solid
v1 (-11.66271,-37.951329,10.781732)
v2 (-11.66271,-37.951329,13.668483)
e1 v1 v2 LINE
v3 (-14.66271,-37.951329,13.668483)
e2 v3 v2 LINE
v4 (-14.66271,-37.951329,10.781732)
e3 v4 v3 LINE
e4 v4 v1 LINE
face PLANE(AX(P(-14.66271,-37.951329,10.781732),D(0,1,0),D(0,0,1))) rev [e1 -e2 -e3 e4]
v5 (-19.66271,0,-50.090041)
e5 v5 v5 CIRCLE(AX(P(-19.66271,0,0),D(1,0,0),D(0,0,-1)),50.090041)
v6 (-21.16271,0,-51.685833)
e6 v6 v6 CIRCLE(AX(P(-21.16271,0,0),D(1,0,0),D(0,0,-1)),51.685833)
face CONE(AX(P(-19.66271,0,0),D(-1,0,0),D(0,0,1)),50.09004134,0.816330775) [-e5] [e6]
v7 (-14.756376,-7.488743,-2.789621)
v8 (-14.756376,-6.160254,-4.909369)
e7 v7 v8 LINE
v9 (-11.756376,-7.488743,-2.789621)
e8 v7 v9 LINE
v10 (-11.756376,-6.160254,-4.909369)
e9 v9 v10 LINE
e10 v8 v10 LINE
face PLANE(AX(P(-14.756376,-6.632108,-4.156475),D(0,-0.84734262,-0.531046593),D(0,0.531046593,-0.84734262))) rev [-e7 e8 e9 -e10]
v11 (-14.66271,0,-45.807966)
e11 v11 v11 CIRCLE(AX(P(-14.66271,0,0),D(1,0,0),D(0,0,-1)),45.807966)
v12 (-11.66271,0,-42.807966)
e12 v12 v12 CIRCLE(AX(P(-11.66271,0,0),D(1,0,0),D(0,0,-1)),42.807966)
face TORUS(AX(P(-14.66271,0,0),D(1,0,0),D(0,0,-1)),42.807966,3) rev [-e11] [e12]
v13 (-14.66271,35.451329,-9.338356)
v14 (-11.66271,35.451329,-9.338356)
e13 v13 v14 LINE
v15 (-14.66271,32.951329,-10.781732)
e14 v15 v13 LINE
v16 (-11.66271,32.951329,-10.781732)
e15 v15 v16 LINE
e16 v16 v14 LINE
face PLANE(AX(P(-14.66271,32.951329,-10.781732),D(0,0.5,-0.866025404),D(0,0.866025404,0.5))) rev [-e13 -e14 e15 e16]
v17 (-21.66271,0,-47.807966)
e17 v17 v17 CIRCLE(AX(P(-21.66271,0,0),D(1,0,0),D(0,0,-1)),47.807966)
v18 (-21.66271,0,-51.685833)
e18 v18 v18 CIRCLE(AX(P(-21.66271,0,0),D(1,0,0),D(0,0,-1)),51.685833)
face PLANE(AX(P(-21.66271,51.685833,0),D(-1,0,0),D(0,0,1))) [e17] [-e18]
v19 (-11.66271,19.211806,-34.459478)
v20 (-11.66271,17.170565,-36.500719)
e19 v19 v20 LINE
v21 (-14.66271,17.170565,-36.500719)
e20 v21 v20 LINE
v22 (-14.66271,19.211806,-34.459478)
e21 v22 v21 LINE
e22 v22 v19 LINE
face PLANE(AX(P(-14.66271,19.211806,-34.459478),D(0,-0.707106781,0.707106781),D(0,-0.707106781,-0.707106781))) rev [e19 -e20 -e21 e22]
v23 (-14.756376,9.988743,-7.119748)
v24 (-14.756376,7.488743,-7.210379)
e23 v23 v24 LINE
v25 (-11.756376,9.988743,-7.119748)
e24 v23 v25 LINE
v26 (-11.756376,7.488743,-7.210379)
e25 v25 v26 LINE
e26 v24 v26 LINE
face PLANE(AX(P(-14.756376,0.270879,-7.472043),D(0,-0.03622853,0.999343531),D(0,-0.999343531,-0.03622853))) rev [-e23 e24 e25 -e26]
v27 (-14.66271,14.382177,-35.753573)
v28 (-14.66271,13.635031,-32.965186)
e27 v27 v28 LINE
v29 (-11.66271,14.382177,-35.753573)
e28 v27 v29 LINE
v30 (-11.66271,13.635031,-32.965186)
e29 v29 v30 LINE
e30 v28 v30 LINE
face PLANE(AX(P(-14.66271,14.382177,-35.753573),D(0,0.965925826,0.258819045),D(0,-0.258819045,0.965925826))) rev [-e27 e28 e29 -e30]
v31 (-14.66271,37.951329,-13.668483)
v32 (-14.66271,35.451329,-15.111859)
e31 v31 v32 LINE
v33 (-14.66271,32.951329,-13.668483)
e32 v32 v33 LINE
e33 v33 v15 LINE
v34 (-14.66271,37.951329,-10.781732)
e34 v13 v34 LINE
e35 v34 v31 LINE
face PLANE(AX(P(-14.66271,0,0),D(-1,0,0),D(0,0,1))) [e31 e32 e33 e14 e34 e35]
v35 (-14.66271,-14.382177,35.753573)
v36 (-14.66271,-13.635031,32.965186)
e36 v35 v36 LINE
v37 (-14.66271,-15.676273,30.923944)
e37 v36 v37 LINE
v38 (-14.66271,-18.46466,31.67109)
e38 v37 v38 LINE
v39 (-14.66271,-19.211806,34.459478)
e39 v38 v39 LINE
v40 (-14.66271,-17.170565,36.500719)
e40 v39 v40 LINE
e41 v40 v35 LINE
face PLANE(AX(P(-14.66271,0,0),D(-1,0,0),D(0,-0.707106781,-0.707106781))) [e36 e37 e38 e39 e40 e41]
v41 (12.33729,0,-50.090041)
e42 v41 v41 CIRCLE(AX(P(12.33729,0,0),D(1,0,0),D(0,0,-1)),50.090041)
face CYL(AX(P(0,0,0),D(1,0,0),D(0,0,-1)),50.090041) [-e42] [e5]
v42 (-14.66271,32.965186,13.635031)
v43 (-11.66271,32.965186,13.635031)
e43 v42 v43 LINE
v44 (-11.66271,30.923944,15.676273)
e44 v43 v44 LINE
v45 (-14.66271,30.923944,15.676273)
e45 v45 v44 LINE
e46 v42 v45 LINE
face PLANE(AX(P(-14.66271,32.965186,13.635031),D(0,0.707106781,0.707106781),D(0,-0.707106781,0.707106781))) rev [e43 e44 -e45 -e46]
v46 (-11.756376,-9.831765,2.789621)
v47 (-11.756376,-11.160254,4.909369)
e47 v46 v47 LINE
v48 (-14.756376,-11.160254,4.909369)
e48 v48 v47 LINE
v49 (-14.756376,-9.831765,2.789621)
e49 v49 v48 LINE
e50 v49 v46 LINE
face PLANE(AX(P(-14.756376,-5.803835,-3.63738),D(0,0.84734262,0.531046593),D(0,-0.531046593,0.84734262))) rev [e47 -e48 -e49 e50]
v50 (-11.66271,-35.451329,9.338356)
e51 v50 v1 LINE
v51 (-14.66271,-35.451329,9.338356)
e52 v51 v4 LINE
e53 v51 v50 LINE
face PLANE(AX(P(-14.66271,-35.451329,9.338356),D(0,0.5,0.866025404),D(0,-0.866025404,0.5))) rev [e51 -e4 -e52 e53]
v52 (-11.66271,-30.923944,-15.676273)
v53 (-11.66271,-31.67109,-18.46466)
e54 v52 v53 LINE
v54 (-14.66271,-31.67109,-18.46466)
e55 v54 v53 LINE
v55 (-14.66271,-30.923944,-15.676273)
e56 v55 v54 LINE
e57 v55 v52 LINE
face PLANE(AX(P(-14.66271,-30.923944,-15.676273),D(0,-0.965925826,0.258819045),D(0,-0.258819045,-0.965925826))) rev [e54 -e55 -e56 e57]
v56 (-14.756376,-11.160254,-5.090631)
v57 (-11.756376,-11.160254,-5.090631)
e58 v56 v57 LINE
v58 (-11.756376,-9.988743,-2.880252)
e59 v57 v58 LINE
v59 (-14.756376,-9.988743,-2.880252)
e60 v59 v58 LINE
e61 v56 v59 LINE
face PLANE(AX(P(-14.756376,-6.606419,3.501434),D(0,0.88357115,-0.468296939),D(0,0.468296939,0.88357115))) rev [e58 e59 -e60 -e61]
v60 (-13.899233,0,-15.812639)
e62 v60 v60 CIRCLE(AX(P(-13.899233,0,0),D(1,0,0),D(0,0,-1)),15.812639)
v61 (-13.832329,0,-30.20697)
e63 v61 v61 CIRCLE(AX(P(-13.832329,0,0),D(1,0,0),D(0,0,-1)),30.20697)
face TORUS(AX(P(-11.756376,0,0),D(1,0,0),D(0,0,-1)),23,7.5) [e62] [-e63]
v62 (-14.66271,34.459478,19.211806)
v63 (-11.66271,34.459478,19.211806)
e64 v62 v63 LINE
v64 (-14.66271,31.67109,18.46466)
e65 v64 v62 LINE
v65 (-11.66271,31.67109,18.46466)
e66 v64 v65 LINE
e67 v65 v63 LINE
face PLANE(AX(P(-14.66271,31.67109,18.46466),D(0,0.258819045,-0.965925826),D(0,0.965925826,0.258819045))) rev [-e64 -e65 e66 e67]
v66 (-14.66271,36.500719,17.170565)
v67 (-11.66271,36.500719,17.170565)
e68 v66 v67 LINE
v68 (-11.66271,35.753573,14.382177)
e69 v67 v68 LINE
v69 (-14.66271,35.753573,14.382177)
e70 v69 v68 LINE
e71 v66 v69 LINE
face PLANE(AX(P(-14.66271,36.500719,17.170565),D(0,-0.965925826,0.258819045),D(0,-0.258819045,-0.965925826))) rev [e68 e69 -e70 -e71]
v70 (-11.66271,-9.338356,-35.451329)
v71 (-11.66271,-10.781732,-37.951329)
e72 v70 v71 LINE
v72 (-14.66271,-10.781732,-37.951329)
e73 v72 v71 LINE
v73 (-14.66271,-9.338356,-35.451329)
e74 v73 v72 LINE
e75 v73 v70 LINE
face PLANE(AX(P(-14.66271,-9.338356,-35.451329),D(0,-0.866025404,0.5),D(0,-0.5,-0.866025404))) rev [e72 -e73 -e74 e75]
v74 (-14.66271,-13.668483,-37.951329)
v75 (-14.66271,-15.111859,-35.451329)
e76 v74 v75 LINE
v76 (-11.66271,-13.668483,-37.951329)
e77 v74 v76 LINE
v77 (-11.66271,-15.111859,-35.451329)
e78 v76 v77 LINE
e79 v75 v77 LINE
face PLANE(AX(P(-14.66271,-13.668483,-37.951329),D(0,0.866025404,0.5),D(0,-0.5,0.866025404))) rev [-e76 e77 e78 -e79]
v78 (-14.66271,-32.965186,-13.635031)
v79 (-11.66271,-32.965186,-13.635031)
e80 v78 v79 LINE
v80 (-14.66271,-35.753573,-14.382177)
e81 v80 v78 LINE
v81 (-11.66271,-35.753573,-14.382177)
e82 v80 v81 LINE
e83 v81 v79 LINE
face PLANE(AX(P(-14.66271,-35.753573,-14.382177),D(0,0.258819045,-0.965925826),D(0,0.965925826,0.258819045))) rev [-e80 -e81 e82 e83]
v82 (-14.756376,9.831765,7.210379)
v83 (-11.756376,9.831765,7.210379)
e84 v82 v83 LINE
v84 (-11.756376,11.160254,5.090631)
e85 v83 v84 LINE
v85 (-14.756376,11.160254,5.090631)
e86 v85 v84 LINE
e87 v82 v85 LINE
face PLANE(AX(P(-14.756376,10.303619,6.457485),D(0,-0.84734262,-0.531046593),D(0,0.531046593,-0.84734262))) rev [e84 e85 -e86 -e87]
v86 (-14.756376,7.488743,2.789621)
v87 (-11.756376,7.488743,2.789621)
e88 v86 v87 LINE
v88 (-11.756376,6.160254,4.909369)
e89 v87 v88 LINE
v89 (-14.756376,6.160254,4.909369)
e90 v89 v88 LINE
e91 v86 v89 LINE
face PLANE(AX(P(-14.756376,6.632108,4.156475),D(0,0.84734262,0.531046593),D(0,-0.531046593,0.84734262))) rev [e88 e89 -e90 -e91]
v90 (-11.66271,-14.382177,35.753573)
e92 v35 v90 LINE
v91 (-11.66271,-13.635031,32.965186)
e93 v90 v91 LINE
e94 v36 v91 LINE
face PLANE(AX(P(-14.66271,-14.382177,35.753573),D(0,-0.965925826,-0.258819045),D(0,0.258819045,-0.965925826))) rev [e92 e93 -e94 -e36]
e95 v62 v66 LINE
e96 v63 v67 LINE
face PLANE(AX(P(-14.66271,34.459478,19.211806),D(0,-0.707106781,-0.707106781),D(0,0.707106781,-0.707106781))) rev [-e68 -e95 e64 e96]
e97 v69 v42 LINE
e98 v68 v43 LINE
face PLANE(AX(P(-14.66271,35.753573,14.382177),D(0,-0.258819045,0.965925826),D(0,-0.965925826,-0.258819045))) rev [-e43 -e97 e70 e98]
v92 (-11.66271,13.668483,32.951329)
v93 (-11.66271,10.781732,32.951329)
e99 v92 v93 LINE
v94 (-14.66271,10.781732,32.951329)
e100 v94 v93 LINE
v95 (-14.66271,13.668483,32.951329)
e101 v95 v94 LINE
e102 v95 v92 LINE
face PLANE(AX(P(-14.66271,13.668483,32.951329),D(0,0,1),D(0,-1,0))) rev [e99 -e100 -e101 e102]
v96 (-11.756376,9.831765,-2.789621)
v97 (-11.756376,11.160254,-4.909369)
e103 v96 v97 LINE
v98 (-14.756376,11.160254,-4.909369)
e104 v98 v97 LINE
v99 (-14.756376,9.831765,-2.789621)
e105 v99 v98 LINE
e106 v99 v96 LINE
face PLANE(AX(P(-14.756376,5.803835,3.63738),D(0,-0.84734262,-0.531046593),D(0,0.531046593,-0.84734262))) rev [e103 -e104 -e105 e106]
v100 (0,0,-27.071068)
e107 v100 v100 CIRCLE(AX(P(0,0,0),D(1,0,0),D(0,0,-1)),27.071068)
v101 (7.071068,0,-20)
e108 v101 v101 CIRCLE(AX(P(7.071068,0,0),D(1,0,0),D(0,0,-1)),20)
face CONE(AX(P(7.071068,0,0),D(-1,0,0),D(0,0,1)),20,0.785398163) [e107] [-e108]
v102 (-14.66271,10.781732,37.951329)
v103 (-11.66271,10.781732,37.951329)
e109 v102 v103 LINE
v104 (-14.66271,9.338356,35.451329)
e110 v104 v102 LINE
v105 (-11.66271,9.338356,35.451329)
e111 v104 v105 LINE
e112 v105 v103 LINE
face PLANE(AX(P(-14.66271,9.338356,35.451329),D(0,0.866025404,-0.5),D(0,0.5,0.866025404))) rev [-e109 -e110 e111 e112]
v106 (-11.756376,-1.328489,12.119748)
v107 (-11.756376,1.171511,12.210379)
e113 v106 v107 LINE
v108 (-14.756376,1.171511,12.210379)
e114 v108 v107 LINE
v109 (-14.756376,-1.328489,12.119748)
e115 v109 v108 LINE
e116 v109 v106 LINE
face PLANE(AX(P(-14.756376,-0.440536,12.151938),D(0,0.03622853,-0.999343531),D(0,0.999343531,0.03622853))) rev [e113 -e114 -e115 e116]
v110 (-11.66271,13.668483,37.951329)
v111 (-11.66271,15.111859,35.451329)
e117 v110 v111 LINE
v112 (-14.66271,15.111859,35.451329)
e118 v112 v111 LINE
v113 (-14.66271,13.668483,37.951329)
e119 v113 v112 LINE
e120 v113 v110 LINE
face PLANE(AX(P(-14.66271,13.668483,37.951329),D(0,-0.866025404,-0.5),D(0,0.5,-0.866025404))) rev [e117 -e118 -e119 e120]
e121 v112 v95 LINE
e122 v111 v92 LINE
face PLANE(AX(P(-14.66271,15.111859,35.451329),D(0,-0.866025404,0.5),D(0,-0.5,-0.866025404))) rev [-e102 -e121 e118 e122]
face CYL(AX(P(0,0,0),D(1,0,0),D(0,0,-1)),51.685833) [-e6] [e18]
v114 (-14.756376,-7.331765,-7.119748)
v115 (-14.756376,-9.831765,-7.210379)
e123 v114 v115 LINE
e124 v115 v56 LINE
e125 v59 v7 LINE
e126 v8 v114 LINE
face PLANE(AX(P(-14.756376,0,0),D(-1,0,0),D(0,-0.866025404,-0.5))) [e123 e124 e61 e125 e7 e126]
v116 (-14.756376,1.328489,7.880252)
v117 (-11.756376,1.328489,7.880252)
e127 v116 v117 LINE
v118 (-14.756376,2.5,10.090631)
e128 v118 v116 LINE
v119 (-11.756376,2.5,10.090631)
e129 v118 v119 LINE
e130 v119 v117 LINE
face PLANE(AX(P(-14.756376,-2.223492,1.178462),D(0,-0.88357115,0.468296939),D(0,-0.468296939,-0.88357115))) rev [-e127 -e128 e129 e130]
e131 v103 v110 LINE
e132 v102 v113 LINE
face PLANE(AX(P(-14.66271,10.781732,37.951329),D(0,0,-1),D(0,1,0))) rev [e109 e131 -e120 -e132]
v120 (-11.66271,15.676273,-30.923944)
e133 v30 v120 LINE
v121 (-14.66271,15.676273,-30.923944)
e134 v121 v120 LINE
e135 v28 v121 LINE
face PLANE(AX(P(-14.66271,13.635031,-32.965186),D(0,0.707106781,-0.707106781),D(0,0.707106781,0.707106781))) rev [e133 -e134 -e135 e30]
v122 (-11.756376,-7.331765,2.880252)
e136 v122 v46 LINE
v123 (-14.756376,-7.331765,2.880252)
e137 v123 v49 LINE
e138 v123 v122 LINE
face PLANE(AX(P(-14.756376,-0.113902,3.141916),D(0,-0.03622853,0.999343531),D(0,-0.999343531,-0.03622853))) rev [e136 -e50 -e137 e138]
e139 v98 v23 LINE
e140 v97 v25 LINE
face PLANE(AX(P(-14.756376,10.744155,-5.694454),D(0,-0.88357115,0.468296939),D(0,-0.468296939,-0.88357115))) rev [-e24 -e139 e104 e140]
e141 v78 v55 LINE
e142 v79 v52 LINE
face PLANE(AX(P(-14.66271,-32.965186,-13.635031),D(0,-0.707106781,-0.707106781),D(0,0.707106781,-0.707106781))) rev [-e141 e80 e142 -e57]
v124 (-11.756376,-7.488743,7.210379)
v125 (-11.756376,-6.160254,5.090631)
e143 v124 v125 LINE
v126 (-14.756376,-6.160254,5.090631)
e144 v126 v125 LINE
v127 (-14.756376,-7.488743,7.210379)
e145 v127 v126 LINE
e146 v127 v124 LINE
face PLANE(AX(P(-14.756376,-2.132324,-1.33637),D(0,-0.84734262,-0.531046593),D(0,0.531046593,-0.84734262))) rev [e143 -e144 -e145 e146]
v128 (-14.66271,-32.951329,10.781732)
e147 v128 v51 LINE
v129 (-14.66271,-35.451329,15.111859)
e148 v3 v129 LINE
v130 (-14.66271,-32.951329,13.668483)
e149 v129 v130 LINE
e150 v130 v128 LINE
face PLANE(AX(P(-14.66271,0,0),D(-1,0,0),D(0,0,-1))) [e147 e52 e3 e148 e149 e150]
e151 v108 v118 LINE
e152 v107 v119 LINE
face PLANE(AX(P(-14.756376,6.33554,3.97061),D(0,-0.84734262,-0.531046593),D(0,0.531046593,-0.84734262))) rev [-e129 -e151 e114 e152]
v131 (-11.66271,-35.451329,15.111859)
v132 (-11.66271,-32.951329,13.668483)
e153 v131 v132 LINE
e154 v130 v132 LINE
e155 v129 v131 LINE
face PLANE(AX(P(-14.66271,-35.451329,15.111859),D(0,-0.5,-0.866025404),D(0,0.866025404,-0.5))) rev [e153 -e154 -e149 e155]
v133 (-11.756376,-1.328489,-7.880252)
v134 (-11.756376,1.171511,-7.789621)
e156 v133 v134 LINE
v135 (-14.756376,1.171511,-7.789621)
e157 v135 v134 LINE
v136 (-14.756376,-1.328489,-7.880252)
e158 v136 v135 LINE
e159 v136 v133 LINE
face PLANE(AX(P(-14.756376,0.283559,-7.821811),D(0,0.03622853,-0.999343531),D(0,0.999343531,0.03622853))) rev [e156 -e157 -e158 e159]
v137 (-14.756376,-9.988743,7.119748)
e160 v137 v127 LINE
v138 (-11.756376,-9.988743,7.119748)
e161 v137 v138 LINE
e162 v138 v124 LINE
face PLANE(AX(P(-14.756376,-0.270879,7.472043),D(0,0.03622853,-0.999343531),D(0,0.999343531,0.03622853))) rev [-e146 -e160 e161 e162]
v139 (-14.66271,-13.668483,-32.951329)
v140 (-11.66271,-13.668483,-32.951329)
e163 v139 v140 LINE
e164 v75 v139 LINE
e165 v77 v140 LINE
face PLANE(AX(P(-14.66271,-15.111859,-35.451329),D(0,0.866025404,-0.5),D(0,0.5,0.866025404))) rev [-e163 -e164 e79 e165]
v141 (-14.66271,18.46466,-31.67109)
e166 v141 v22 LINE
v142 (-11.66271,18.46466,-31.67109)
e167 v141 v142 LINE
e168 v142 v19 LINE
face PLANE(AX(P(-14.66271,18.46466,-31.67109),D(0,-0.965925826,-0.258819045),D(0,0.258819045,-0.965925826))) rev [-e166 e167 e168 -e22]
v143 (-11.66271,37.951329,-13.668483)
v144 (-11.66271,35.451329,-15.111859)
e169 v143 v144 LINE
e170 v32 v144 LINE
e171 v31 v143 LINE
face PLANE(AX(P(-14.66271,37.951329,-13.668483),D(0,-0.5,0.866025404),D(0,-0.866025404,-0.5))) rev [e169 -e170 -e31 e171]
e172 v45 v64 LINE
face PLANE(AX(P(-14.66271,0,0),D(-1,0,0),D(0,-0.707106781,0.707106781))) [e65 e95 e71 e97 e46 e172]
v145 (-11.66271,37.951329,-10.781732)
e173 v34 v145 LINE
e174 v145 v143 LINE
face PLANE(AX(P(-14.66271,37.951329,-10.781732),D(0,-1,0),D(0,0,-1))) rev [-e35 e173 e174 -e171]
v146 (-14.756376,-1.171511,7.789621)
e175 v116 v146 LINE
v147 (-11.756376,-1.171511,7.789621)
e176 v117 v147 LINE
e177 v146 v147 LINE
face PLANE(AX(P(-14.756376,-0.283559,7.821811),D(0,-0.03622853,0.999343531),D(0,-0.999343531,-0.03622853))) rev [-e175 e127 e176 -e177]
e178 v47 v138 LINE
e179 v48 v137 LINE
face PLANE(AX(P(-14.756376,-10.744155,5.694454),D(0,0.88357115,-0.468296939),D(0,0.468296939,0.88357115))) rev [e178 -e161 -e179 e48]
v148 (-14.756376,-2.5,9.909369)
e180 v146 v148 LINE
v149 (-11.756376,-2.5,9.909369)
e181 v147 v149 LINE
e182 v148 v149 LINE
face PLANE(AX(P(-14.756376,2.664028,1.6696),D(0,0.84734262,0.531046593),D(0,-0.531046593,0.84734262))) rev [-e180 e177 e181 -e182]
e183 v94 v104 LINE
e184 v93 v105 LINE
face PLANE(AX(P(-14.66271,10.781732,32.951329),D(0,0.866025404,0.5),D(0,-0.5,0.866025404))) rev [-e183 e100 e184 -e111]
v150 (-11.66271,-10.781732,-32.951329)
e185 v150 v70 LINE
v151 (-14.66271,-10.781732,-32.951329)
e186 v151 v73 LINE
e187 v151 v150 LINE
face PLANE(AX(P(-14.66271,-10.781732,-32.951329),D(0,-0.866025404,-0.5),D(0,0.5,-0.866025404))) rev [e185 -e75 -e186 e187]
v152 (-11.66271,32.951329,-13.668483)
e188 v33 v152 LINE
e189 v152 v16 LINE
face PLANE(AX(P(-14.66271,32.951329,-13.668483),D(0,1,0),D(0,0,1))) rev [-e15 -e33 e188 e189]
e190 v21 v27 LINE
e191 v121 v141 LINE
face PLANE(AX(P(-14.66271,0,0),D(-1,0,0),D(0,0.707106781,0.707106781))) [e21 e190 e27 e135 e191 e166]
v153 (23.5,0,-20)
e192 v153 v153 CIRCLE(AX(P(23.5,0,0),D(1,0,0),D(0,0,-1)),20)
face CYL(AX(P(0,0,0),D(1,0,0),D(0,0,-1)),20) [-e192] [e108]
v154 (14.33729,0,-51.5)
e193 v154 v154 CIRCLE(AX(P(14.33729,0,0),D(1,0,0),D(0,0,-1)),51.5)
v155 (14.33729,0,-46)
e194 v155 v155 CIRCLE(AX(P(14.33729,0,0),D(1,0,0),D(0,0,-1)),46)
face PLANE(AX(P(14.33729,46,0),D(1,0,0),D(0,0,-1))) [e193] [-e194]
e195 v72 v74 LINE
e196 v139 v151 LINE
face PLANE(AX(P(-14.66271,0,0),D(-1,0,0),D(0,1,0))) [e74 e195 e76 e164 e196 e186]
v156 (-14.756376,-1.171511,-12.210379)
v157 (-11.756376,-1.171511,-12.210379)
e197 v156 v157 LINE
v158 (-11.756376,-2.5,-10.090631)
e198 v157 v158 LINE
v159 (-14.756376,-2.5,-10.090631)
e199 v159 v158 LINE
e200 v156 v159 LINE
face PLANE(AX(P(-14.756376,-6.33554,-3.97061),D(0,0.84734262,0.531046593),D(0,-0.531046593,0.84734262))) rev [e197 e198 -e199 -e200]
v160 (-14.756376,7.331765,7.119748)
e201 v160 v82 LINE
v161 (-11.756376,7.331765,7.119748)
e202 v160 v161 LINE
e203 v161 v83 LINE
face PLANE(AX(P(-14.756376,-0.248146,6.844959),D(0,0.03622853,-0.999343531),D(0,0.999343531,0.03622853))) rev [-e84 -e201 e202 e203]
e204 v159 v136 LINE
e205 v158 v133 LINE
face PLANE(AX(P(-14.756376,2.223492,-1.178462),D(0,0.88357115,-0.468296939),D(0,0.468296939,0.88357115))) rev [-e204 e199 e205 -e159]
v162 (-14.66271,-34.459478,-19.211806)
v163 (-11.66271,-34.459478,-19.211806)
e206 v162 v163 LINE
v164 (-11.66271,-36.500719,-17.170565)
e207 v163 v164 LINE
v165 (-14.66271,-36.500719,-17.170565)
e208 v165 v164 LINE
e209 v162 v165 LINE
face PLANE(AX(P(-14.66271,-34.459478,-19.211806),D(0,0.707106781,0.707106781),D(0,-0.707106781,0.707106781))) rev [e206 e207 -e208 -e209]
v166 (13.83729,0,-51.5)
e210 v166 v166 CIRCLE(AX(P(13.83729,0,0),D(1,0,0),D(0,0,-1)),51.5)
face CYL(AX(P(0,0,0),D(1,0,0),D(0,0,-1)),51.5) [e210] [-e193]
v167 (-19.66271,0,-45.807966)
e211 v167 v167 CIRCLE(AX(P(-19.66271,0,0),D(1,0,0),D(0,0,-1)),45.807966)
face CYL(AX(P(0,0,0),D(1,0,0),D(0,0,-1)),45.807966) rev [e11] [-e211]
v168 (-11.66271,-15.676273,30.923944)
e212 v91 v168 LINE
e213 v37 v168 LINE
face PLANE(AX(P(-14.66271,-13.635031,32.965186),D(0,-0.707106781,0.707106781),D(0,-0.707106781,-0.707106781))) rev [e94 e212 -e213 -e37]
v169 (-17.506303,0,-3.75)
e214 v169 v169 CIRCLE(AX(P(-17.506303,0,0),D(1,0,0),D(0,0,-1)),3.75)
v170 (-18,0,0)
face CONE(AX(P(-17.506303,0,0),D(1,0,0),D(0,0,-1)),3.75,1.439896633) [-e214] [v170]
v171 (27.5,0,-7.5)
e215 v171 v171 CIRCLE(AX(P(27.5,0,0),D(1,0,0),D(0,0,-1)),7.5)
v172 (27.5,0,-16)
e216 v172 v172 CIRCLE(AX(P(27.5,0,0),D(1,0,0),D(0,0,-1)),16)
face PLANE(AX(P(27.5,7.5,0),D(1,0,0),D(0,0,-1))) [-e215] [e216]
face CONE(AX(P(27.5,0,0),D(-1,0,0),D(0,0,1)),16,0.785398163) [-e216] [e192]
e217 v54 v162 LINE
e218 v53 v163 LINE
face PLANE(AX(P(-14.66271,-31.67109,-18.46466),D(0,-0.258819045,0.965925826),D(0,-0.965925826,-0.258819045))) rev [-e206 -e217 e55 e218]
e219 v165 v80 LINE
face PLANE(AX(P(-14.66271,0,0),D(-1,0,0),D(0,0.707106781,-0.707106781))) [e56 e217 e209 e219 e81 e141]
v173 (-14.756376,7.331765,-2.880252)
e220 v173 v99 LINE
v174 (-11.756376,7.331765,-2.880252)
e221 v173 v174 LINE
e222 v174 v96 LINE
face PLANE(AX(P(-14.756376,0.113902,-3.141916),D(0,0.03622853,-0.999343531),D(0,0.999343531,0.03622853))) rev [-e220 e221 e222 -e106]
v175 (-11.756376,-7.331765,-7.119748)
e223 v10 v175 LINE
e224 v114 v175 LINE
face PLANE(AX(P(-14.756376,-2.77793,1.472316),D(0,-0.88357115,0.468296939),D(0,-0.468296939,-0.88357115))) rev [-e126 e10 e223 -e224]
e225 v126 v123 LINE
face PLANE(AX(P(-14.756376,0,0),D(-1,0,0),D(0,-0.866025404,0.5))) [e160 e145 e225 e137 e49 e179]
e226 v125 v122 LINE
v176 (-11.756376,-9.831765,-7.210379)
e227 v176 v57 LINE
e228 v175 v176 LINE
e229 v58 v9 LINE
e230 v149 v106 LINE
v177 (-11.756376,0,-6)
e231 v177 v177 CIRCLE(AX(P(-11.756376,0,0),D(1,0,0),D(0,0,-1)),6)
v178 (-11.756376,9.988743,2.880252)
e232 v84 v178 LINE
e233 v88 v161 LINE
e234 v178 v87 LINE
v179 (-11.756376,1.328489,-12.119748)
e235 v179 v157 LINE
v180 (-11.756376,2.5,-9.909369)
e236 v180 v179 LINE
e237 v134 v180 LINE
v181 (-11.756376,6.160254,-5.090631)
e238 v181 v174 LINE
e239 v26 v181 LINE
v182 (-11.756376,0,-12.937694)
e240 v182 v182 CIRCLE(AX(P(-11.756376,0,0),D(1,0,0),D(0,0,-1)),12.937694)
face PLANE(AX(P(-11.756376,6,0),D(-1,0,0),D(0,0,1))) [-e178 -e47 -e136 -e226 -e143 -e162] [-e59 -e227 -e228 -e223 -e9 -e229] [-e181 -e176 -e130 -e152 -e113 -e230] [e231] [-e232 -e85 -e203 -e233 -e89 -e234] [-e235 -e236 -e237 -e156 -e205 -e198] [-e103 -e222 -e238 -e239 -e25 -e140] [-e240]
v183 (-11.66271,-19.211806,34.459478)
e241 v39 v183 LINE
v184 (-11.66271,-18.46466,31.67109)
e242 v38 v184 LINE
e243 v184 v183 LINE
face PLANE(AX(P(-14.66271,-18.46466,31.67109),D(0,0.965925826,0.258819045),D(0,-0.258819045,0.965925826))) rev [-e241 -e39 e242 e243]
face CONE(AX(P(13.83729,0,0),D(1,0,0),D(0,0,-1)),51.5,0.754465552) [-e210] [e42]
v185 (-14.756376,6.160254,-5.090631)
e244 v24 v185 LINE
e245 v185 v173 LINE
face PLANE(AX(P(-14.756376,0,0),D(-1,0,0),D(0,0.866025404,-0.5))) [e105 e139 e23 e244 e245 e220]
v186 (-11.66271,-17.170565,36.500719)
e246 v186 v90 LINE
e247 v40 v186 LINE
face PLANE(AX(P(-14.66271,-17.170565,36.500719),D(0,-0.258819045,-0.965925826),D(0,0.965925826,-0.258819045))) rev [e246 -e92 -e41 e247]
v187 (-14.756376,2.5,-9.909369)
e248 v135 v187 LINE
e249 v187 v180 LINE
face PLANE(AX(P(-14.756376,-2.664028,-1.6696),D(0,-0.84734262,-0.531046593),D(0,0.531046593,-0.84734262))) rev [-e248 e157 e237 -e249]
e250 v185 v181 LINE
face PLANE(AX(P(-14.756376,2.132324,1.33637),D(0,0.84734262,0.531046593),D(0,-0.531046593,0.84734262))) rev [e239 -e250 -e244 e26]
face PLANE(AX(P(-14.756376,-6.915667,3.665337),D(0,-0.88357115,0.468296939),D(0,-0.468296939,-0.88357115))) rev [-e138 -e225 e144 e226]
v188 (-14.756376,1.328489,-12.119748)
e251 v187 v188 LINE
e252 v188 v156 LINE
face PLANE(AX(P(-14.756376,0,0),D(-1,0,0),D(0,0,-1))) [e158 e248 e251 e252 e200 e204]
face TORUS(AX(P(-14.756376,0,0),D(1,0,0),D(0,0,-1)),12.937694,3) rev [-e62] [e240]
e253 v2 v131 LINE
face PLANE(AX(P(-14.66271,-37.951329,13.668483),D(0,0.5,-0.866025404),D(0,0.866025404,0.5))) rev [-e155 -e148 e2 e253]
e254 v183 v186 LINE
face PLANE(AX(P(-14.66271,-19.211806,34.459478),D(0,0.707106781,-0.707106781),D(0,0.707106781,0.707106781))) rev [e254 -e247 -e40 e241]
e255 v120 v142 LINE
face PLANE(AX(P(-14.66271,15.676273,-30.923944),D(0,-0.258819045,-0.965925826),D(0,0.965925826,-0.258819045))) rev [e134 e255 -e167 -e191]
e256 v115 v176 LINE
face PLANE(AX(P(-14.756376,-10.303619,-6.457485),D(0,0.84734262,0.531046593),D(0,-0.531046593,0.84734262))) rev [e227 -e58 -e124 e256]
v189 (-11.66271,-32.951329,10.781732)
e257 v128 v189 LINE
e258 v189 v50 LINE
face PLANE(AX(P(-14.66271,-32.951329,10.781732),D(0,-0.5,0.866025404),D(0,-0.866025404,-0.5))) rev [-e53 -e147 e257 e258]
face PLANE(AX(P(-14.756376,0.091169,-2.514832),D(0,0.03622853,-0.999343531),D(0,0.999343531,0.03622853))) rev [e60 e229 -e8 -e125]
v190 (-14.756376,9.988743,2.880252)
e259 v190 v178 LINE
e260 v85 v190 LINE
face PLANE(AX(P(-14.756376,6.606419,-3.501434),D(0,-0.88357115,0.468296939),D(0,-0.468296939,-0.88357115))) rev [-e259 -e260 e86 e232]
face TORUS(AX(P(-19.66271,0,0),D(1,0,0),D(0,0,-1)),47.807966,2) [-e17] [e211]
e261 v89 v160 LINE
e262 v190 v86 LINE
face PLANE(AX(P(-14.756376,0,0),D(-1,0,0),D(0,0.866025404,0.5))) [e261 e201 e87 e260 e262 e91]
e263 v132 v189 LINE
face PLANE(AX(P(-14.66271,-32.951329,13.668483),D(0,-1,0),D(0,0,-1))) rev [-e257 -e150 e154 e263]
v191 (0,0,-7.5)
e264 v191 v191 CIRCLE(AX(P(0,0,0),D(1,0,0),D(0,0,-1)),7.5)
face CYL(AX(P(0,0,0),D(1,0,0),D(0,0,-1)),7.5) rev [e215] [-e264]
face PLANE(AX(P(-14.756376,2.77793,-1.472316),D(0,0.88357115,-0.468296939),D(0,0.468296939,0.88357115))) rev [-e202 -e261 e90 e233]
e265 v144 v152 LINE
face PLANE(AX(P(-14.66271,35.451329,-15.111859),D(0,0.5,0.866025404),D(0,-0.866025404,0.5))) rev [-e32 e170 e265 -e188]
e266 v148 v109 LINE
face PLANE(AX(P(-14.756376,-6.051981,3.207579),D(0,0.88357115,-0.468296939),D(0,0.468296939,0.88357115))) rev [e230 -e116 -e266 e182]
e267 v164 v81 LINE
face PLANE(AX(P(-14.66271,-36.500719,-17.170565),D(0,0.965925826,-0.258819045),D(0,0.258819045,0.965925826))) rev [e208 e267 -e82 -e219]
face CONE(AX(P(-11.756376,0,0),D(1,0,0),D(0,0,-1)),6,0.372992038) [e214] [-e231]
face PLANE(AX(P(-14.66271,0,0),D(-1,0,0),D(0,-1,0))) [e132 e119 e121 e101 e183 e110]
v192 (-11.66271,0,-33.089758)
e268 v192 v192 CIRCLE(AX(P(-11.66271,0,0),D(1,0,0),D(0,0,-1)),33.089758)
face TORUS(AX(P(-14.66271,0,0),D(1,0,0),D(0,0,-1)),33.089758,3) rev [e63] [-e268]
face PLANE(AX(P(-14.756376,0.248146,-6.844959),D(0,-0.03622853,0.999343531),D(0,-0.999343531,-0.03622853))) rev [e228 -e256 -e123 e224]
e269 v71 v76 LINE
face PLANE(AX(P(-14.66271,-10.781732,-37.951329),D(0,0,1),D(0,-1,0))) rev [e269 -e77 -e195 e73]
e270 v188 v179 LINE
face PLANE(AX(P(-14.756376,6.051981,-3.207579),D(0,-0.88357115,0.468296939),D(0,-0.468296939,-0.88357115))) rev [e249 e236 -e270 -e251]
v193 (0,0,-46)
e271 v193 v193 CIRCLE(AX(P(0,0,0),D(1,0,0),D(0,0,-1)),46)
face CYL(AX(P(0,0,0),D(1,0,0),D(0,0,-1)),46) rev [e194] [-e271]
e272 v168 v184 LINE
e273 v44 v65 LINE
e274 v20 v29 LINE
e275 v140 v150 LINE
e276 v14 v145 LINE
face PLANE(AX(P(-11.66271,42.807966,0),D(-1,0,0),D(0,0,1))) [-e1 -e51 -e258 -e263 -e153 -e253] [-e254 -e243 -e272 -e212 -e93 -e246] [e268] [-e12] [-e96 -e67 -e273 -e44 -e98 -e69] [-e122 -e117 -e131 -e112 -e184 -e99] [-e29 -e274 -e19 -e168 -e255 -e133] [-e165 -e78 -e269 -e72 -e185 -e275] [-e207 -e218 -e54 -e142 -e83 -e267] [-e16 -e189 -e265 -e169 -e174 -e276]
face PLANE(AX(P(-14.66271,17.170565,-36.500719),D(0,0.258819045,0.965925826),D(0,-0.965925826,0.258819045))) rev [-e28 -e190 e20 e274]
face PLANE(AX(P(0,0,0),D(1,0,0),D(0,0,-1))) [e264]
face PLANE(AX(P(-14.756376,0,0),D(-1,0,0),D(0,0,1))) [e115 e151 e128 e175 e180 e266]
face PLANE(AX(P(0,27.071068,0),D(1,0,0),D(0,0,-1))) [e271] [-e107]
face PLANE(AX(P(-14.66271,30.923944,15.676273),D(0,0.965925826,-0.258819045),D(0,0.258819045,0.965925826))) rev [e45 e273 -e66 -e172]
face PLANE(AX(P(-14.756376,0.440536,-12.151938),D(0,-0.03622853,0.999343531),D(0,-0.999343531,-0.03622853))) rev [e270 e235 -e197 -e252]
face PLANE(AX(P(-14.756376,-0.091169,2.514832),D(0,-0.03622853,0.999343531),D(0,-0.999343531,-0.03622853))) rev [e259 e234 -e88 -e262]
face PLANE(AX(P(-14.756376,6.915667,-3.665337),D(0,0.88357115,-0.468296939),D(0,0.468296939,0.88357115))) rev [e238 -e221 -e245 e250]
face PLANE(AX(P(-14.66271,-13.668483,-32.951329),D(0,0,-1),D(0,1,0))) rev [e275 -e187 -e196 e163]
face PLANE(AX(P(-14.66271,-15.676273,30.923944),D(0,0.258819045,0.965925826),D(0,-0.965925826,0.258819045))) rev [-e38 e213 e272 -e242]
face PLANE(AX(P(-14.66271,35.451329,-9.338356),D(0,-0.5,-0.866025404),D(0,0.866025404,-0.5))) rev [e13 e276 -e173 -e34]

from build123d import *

# Parameters (mm, degrees)
BOSS_EXTRUDE1_DEPTH = 3
CIRPATTERN2_START   = -14.662710124
CIRPATTERN2_DEPTH   = 3
BOSS_EXTRUDE4_DEPTH = 15
BOSS_EXTRUDE5_DEPTH = 3
CIRPATTERN4_COUNT   = 6


# Read off the part's stored shape, not the designer's step: CirPattern2
with BuildPart() as part:
    # Sketch1 → Revolve1 (revolve)
    with BuildSketch(Plane.XY, mode=Mode.PRIVATE) as revolve1_sk:
        with BuildLine():
            Line((-18, 0), (0, 0))
            Line((0, 0), (0, 7.5))
            Line((0, 7.5), (27.5, 7.5))
            Line((27.5, 7.5), (27.5, 16))
            Line((27.5, 16), (23.5, 20))
            Line((23.5, 20), (7.071067812, 20))
            Line((7.071067812, 20), (0, 27.071067812))
            Line((0, 27.071067812), (0, 46))
            Line((0, 46), (14.337289876, 46))
            Line((14.337289876, 46), (14.337289876, 51.5))
            Line((14.337289876, 51.5), (13.837289876, 51.5))
            Line((13.837289876, 51.5), (12.337289876, 50.09004134))
            Line((12.337289876, 50.09004134), (-19.662710124, 50.09004134))
            Line((-19.662710124, 50.09004134), (-21.162710124, 51.685832808))
            Line((-21.162710124, 51.685832808), (-21.662710124, 51.685832808))
            Line((-21.662710124, 51.685832808), (-21.662710124, 47.807966179))
            ThreePointArc((-21.662710124, 47.807966179), (-21.076923686, 46.393752617), (-19.662710124, 45.807966179))
            Line((-19.662710124, 45.807966179), (-14.662710124, 45.807966179))
            ThreePointArc((-14.662710124, 45.807966179), (-12.54138978, 44.929286522), (-11.662710124, 42.807966179))
            Line((-11.662710124, 42.807966179), (-11.662710124, 33.089758348))
            ThreePointArc((-11.662710124, 33.089758348), (-12.265717914, 31.285754926), (-13.832329022, 30.206970249))
            ThreePointArc((-13.832329022, 30.206970249), (-19.256295256, 23.034859381), (-13.899233411, 15.812638644))
            ThreePointArc((-13.899233411, 15.812638644), (-12.351025091, 14.730537015), (-11.756376268, 12.937694101))
            Line((-11.756376268, 12.937694101), (-11.756376268, 6))
            Line((-11.756376268, 6), (-17.506303134, 3.75))
            Line((-17.506303134, 3.75), (-18, 0))
        make_face()
    revolve(revolve1_sk.sketch.rotate(Axis((0, 0, 0), (-1, 0, 0)), 90), axis=Axis((0, 0, 0), (-1, 0, 0)))

    # Sketch3 → Boss-Extrude1 (add)
    with BuildSketch(Plane.ZY.offset(11.662710124)):
        Polygon((-10.78173197, 32.951329215), (-9.338356297, 35.451329215), (-10.78173197, 37.951329215), (-13.668483316, 37.951329215), (-15.111858989, 35.451329215), (-13.668483316, 32.951329215), align=None)
    extrude(amount=BOSS_EXTRUDE1_DEPTH)

    # CirPattern2 outline → CirPattern2 (add)
    with BuildSketch(Plane.YZ.offset(CIRPATTERN2_START)):
        Polygon((15.676272548, -30.923944126), (13.635031096, -32.965185578), (14.382177323, -35.753573258), (17.170565002, -36.500719484), (19.211806454, -34.459478032), (18.464660227, -31.671090353), align=None)
        Polygon((-10.78173197, -32.951329215), (-13.668483316, -32.951329215), (-15.111858989, -35.451329215), (-13.668483316, -37.951329215), (-10.78173197, -37.951329215), (-9.338356297, -35.451329215), align=None)
        Polygon((-30.923944126, -15.676272548), (-32.965185578, -13.635031096), (-35.753573258, -14.382177323), (-36.500719484, -17.170565002), (-34.459478032, -19.211806454), (-31.671090353, -18.464660227), align=None)
        Polygon((-32.951329215, 10.78173197), (-32.951329215, 13.668483316), (-35.451329215, 15.111858989), (-37.951329215, 13.668483316), (-37.951329215, 10.78173197), (-35.451329215, 9.338356297), align=None)
        Polygon((-15.676272548, 30.923944126), (-13.635031096, 32.965185578), (-14.382177323, 35.753573258), (-17.170565002, 36.500719484), (-19.211806454, 34.459478032), (-18.464660227, 31.671090353), align=None)
        Polygon((10.78173197, 32.951329215), (13.668483316, 32.951329215), (15.111858989, 35.451329215), (13.668483316, 37.951329215), (10.78173197, 37.951329215), (9.338356297, 35.451329215), align=None)
        Polygon((30.923944126, 15.676272548), (32.965185578, 13.635031096), (35.753573258, 14.382177323), (36.500719484, 17.170565002), (34.459478032, 19.211806454), (31.671090353, 18.464660227), align=None)
    extrude(amount=CIRPATTERN2_DEPTH)

    # Sketch2 → Boss-Extrude4 (add)
    with BuildSketch(Plane(origin=(0, 0, 0), x_dir=(0, 0, -1), z_dir=(1, 0, 0))):
        Polygon((7.765457102, 0.52381741), (10.038194204, -0.517655617), (12.076504853, 0.929855936), (11.842078401, 3.418840516), (9.569341299, 4.460313543), (7.531030649, 3.01280199), align=None)
    extrude(amount=BOSS_EXTRUDE4_DEPTH)

    # Sketch5 → Boss-Extrude5 (add)
    with BuildSketch(Plane.ZY.offset(11.756376268)):
        Polygon((12.21037892, 1.171511407), (10.090630821, 2.5), (7.880251901, 1.328488593), (7.78962108, -1.171511407), (9.909369179, -2.5), (12.119748099, -1.328488593), align=None)
    boss_extrude5 = extrude(amount=BOSS_EXTRUDE5_DEPTH)

    # CirPattern4: Boss-Extrude5 ×6 about axis
    cirpattern4_axis = Axis((0, 0, 0), (1, 0, 0))
    for i in range(1, CIRPATTERN4_COUNT):
        add(boss_extrude5.rotate(cirpattern4_axis, i * 360 / CIRPATTERN4_COUNT))


solid = part.part
